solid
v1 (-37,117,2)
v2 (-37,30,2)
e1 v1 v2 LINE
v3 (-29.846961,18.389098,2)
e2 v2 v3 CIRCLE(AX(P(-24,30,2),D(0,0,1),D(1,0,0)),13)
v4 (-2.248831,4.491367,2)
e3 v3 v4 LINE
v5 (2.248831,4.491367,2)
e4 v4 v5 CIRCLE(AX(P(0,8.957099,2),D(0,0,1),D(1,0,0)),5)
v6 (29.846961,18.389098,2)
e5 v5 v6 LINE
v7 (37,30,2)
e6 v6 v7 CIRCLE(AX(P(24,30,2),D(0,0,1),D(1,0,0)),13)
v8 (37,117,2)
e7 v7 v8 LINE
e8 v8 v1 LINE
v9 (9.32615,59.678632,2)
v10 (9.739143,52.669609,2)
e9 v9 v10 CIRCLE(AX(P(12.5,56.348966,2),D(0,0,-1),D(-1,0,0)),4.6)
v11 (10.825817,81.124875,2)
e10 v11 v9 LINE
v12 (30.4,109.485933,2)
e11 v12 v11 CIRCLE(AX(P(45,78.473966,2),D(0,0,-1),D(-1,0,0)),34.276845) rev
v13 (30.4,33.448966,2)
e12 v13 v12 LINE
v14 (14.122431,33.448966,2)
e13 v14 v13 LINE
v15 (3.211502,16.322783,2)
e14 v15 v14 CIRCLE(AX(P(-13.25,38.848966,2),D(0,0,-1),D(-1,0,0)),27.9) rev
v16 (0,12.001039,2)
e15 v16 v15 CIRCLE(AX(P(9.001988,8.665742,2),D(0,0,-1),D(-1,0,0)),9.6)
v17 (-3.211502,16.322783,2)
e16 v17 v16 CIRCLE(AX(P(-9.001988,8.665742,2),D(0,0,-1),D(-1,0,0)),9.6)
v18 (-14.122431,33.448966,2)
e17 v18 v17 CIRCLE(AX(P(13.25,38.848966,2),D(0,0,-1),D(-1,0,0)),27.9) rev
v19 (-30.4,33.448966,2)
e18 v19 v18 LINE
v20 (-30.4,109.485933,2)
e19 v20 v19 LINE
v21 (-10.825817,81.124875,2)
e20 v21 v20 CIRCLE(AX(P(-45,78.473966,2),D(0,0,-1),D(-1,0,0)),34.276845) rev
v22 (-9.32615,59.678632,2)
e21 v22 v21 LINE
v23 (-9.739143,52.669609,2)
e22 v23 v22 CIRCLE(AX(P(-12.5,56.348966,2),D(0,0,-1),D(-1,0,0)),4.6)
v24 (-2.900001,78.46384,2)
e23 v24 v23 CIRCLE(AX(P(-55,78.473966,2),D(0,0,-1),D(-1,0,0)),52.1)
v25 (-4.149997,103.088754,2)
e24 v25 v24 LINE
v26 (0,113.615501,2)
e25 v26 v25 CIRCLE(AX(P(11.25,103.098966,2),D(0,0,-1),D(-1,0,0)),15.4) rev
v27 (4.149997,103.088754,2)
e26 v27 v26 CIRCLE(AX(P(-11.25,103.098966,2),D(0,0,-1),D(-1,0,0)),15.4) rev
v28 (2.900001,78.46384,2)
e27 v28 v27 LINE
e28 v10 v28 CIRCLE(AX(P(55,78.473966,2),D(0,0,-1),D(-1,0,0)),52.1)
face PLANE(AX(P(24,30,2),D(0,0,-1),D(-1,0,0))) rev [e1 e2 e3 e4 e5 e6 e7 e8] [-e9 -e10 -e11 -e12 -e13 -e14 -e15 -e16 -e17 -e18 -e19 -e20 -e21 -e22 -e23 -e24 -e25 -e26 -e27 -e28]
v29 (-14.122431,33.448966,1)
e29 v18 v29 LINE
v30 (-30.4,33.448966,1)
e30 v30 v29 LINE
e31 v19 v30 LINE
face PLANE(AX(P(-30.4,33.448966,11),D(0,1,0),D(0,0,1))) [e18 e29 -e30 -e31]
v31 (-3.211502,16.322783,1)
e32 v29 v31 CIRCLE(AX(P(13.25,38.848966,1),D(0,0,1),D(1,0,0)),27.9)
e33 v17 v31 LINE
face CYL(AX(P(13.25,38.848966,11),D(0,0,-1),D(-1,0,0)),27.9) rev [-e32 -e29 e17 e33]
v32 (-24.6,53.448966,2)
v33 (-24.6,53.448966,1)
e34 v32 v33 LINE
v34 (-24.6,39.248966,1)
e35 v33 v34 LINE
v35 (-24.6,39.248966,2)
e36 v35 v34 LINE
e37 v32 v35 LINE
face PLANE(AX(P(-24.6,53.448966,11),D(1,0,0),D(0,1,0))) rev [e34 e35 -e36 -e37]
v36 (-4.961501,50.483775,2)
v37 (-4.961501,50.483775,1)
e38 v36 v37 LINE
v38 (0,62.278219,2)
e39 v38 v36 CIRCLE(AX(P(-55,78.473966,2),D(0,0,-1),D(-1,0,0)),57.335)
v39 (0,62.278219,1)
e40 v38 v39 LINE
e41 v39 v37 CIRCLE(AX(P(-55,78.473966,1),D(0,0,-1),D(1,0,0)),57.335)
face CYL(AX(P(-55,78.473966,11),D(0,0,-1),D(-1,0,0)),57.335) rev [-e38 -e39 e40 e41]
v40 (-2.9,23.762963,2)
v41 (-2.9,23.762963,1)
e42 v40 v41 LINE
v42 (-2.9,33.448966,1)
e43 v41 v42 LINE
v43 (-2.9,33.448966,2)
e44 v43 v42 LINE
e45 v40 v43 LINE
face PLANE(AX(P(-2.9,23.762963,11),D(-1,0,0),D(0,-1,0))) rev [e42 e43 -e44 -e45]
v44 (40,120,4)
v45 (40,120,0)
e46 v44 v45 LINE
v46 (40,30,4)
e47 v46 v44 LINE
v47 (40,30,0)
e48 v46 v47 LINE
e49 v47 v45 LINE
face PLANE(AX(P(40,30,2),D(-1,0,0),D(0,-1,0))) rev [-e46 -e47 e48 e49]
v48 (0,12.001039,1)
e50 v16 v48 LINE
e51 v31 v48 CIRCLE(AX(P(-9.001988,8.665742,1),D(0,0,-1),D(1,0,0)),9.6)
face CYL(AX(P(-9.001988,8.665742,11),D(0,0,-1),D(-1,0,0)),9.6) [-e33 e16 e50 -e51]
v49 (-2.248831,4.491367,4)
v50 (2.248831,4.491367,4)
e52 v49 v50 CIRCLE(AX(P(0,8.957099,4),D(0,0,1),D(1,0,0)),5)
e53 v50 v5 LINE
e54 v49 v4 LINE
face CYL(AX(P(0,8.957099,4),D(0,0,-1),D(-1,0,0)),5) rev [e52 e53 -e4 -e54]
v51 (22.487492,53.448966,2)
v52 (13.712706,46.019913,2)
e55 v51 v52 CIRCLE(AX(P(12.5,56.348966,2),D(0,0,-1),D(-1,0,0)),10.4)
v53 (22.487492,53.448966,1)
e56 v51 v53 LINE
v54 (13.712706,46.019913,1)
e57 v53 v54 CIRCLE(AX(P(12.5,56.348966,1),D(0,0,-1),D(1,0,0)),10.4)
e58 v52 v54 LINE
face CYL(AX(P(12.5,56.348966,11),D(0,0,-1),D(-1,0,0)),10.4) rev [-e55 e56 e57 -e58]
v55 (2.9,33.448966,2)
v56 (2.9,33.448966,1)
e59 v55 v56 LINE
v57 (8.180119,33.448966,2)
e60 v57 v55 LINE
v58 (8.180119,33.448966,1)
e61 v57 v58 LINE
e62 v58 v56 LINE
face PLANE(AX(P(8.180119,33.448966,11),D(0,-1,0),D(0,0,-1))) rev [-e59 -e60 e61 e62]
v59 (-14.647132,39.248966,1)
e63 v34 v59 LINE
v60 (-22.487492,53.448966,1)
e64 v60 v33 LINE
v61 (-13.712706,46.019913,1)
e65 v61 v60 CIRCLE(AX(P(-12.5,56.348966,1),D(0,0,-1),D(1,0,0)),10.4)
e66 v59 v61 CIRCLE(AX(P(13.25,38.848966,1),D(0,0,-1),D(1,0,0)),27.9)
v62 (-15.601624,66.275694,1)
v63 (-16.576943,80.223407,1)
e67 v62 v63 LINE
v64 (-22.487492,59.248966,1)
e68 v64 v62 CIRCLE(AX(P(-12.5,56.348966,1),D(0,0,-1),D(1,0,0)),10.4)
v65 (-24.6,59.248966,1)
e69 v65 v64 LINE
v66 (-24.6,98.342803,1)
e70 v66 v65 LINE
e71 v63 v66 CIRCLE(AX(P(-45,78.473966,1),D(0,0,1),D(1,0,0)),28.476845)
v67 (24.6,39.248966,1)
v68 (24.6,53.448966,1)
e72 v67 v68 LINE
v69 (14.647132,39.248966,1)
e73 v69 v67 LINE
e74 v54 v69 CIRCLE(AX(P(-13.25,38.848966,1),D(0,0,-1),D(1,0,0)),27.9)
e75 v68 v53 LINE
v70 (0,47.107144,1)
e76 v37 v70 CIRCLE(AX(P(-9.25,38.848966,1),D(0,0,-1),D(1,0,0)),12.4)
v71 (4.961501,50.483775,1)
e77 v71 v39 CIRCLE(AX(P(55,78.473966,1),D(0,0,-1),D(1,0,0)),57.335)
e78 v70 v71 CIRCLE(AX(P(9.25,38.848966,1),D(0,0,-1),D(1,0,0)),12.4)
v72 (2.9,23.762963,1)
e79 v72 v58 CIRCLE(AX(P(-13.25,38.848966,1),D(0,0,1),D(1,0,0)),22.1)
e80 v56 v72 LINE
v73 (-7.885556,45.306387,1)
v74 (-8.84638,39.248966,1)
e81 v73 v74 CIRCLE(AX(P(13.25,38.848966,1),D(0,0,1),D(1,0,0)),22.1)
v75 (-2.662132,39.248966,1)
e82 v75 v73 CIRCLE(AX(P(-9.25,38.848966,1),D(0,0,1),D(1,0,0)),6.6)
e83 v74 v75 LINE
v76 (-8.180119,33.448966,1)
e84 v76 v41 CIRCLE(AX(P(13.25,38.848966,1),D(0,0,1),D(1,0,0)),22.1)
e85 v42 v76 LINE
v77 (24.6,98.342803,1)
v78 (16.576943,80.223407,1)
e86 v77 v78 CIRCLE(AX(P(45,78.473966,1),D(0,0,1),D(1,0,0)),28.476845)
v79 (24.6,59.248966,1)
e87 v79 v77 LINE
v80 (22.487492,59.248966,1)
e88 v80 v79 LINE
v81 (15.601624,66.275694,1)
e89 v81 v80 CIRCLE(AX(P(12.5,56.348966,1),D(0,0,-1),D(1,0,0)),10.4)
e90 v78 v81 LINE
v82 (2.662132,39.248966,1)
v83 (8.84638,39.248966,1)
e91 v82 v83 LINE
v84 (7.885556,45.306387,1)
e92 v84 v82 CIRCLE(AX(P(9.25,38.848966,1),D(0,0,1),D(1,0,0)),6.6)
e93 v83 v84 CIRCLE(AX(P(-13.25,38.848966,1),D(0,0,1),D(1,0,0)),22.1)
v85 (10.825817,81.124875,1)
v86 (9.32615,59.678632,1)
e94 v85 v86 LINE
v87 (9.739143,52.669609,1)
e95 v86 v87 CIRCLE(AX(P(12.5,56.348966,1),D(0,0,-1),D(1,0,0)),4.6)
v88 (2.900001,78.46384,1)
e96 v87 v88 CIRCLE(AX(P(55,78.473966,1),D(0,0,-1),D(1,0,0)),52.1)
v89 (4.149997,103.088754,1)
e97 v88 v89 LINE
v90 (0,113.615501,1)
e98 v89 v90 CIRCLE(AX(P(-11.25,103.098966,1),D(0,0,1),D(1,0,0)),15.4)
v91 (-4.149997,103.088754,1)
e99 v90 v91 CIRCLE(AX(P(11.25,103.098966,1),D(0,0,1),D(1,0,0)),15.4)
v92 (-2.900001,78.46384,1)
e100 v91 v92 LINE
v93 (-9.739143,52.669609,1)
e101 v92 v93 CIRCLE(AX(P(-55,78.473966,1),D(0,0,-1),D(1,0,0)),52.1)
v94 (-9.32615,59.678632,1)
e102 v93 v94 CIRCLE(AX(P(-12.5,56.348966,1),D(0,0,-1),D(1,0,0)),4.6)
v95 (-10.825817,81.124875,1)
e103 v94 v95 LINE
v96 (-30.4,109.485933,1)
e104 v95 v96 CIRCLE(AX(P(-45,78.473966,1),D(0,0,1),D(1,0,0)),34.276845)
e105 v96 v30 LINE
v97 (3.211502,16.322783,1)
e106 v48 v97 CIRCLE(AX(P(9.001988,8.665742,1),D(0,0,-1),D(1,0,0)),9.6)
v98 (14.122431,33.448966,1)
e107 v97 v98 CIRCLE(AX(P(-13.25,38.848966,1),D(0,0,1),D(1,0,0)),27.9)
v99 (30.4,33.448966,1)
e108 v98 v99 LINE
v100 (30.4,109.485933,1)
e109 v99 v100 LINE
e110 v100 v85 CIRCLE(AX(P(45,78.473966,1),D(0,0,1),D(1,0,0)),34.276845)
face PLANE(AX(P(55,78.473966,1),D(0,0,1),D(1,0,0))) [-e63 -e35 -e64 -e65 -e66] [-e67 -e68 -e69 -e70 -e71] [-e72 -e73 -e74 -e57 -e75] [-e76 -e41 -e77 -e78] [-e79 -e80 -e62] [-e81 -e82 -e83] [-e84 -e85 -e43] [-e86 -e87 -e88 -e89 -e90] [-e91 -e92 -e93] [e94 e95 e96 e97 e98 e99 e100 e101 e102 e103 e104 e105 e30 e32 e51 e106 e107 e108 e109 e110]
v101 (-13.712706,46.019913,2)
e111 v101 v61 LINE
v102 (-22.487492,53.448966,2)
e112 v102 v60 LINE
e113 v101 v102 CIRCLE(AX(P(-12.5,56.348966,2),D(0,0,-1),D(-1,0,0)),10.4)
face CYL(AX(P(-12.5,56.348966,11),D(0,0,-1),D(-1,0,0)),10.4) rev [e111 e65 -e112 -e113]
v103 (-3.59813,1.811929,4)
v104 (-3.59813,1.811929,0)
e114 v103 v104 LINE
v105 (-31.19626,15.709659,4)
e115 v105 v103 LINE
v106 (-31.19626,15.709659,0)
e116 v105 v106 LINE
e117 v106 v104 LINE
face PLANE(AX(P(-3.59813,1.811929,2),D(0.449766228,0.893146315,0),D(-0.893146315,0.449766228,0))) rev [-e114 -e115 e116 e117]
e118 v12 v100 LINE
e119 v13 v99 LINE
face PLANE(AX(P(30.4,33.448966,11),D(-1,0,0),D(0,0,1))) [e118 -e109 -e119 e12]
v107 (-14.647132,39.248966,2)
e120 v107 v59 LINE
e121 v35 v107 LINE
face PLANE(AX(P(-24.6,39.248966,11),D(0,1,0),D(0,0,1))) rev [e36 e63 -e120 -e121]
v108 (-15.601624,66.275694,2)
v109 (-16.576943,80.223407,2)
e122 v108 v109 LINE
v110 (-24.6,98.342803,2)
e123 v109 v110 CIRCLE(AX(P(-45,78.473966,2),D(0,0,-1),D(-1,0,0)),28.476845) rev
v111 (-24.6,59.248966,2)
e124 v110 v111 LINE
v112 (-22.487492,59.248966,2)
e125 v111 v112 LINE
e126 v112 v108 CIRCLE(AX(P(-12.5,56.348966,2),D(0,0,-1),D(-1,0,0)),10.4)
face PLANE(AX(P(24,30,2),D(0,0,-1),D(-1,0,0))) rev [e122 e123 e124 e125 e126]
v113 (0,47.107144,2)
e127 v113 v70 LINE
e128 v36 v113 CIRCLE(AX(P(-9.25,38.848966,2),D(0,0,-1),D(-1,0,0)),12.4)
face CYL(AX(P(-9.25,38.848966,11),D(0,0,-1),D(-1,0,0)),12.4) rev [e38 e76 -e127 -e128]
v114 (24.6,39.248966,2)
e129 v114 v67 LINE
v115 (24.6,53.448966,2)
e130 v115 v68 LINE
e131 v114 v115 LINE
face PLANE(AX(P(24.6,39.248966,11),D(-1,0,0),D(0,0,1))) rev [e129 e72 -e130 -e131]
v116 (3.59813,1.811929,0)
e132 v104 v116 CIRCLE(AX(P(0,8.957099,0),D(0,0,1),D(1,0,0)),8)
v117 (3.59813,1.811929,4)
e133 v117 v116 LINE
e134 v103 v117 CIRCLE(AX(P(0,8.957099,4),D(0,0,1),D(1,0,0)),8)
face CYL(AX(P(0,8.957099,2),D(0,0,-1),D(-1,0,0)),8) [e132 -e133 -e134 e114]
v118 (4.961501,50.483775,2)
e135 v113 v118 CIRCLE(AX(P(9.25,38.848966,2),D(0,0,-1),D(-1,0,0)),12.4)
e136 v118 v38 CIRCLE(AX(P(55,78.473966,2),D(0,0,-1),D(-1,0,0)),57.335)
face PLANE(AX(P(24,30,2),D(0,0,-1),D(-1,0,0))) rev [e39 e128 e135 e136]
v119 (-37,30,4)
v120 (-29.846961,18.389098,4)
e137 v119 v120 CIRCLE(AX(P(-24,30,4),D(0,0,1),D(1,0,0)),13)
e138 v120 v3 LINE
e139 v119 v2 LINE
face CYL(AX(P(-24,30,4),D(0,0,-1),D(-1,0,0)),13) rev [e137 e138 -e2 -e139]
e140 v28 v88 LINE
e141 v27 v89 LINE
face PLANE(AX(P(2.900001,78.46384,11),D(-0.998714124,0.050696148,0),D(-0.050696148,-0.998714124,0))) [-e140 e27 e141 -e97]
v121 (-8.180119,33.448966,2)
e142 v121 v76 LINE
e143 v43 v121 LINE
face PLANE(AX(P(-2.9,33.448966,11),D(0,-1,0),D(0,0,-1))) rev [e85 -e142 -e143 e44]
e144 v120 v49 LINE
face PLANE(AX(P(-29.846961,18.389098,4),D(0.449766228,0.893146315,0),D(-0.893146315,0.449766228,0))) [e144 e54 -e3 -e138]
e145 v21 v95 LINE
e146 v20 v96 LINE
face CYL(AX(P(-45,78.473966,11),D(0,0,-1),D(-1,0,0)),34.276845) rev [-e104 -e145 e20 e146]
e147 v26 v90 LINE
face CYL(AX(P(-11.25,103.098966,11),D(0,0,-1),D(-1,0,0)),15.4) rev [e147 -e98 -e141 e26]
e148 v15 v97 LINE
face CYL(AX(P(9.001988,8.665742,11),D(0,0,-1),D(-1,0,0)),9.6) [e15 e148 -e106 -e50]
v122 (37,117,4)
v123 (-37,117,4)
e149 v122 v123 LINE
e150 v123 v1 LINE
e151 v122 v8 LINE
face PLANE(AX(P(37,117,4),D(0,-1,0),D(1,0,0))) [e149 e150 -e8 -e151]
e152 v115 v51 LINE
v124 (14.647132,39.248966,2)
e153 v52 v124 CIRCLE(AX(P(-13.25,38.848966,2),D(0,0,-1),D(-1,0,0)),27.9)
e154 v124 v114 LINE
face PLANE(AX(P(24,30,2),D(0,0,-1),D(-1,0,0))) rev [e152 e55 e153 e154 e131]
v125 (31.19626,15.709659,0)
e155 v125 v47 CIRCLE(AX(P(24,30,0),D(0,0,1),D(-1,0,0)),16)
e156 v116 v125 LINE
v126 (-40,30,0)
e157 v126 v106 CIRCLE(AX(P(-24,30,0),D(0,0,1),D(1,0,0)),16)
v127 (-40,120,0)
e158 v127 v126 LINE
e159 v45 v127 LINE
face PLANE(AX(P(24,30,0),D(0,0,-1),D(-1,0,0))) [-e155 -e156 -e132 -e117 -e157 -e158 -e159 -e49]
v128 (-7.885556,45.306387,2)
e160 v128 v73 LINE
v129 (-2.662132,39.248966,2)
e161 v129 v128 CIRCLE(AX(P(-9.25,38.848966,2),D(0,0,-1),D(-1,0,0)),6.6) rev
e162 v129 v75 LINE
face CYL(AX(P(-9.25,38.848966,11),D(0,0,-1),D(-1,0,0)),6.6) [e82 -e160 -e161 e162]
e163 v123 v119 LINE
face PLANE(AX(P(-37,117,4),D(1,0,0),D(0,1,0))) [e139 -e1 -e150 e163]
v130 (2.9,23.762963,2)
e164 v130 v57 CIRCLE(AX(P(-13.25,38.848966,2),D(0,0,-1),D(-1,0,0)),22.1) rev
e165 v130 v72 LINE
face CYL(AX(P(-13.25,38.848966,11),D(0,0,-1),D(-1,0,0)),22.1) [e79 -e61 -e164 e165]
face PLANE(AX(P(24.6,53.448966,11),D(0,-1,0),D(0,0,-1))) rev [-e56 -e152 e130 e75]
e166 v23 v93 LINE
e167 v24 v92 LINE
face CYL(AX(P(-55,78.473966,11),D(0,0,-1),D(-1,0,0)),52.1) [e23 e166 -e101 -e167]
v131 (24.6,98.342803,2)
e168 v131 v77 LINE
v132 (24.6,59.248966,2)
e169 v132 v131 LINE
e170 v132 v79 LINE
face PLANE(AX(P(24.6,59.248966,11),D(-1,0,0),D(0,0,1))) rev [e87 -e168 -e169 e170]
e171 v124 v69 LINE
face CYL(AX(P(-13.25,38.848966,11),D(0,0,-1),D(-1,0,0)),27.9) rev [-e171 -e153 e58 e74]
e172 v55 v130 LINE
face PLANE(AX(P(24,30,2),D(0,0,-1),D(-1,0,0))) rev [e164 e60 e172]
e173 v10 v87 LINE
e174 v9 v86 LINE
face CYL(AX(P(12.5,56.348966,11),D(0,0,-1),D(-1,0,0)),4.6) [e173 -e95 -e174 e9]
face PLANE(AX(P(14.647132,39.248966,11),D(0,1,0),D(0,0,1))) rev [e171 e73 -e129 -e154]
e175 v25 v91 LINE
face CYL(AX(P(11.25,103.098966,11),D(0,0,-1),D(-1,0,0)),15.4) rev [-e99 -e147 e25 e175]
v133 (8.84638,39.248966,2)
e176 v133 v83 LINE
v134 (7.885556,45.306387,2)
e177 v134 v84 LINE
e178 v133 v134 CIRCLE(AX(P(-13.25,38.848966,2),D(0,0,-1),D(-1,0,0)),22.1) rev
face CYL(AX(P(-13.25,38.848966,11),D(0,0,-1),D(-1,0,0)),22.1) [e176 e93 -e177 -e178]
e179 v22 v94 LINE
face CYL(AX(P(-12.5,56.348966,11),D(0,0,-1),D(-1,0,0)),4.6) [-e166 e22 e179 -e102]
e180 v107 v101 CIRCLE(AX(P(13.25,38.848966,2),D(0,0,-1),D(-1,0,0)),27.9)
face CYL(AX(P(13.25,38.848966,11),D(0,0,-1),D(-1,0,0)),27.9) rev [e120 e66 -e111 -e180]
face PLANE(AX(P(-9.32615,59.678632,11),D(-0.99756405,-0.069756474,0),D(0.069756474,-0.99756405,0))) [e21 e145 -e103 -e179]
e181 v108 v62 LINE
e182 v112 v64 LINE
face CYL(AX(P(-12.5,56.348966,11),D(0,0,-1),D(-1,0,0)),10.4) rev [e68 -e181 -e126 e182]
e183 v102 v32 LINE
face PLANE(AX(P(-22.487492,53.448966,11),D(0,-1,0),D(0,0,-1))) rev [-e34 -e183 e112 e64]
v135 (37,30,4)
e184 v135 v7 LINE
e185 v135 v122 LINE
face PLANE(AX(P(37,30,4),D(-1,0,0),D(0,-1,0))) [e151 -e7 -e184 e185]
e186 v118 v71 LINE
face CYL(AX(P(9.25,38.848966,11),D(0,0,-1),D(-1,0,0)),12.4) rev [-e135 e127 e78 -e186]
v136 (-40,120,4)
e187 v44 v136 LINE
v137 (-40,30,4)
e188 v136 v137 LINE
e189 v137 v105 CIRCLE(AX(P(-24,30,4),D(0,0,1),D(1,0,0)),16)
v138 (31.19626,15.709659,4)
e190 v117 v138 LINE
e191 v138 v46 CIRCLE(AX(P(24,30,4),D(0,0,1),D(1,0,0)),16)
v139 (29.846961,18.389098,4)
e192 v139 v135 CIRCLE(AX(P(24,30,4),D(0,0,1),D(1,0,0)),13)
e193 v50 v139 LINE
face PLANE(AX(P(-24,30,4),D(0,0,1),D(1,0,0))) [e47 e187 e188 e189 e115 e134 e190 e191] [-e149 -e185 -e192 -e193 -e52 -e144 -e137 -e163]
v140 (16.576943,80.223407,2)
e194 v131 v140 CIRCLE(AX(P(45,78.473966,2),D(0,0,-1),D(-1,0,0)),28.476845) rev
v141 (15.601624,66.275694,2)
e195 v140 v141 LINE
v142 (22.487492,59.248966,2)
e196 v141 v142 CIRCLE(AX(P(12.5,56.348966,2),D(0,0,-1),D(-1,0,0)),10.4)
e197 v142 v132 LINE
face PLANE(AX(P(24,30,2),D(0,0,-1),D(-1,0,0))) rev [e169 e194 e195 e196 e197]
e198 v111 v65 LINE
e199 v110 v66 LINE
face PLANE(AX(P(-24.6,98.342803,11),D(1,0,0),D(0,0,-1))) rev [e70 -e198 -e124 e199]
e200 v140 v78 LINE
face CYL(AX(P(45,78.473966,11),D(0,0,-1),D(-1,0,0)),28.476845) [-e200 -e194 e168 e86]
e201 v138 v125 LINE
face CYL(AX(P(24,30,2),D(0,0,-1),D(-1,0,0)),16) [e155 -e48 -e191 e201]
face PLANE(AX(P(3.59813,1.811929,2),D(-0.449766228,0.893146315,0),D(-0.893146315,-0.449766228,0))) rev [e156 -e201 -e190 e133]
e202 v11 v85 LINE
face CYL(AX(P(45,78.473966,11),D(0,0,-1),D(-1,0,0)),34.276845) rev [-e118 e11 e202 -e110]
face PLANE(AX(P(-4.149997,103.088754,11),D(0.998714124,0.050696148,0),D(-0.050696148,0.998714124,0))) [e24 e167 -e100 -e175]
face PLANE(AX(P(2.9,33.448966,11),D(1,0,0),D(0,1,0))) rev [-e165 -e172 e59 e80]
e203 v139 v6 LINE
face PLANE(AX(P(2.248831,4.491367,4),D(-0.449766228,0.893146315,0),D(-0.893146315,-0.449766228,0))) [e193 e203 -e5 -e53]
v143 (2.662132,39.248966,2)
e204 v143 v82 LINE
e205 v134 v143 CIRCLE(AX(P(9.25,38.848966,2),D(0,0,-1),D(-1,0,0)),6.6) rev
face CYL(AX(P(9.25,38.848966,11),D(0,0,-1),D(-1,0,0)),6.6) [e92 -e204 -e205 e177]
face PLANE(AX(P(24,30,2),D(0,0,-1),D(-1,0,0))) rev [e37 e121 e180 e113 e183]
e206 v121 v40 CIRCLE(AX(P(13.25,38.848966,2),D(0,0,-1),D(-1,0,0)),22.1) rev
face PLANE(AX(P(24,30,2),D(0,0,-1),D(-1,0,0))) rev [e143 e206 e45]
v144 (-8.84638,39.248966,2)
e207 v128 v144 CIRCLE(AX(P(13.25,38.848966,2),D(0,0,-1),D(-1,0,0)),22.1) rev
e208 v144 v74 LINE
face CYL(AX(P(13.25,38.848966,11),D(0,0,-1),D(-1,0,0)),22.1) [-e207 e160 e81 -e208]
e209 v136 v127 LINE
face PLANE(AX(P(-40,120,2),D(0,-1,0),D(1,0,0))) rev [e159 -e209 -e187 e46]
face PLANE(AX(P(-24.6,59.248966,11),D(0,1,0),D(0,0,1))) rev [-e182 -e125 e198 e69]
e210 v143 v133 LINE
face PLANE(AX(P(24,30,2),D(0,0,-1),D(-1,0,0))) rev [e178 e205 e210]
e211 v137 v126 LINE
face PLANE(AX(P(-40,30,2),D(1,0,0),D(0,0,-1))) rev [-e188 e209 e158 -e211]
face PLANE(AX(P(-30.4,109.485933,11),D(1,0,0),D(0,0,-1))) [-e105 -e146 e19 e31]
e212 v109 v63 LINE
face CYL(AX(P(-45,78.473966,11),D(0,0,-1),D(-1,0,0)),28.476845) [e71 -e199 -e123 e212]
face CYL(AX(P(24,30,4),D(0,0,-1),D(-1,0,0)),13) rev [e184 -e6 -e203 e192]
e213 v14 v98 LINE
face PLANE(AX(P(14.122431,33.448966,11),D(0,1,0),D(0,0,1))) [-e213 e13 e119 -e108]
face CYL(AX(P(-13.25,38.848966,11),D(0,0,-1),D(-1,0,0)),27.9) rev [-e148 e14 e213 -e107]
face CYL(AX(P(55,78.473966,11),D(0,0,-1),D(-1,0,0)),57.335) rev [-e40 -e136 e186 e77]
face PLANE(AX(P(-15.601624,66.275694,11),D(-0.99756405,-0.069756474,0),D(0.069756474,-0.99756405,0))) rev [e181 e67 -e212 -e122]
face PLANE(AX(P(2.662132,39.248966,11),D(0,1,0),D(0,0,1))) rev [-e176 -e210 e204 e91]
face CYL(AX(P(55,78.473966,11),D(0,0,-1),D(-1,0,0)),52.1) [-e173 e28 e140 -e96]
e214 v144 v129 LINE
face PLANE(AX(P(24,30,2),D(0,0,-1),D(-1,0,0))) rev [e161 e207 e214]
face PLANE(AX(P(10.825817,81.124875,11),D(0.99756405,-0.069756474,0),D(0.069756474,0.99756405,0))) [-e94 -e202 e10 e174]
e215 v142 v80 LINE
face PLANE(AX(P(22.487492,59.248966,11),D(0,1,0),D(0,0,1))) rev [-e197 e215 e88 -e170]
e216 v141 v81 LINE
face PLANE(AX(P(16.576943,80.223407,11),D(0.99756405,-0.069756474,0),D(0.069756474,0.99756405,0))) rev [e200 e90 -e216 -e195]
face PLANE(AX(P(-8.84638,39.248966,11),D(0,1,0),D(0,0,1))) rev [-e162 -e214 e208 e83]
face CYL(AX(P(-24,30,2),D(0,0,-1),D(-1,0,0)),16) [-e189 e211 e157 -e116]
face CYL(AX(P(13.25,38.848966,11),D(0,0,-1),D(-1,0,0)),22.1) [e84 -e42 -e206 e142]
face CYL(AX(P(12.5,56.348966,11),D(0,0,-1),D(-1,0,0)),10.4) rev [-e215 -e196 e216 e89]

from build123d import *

# Parameters (mm, degrees)
EXTRUDE_1_DEPTH     = 2
EXTRUDE_2_DEPTH     = 2
OTHER_START         = 1
OTHER_1_DEPTH       = 1
CUT_EXTRUDE_1_DEPTH = 10


# Read off the part's stored shape, not the designer's step: Полость1
with BuildPart() as part:
    # Эскиз1 → Бобышка-Вытянуть1 (new body)
    with BuildSketch(Plane.XY):
        with BuildLine():
            Line((-3.59812982, 1.811928513), (-31.19625964, 15.709658955))
            ThreePointArc((-31.19625964, 15.709658955), (-37.622410841, 21.607746257), (-40, 30))
            Line((-40, 30), (-40, 120))
            Line((-40, 120), (40, 120))
            Line((40, 120), (40, 30))
            ThreePointArc((40, 30), (37.622410841, 21.607746257), (31.19625964, 15.709658955))
            Line((31.19625964, 15.709658955), (3.59812982, 1.811928513))
            ThreePointArc((3.59812982, 1.811928513), (0, 0.957099036), (-3.59812982, 1.811928513))
        make_face()
    extrude(amount=EXTRUDE_1_DEPTH)

    # Эскиз2 → Бобышка-Вытянуть2 (add)
    with BuildSketch(Plane.XY.offset(2)):
        with BuildLine():
            Line((40, 120), (-40, 120))
            Line((-40, 120), (-40, 30))
            ThreePointArc((-40, 30), (-37.622410841, 21.607746257), (-31.19625964, 15.709658955))
            Line((-31.19625964, 15.709658955), (-3.59812982, 1.811928513))
            ThreePointArc((-3.59812982, 1.811928513), (0, 0.957099036), (3.59812982, 1.811928513))
            Line((3.59812982, 1.811928513), (31.19625964, 15.709658955))
            ThreePointArc((31.19625964, 15.709658955), (37.622410841, 21.607746257), (40, 30))
            Line((40, 30), (40, 120))
        make_face()
        with BuildLine():
            Line((37, 117), (-37, 117))
            Line((-37, 117), (-37, 30))
            ThreePointArc((-37, 30), (-35.068208808, 23.181293834), (-29.846960958, 18.389097901))
            Line((-29.846960958, 18.389097901), (-2.248831138, 4.491367459))
            ThreePointArc((-2.248831138, 4.491367459), (0, 3.957099036), (2.248831138, 4.491367459))
            Line((2.248831138, 4.491367459), (29.846960958, 18.389097901))
            ThreePointArc((29.846960958, 18.389097901), (35.068208808, 23.181293834), (37, 30))
            Line((37, 30), (37, 117))
        make_face(mode=Mode.SUBTRACT)
    extrude(amount=EXTRUDE_2_DEPTH)

    # Полость1 outline → Полость1 (cut)
    with BuildSketch(Plane.XY.offset(OTHER_START)):
        with BuildLine():
            ThreePointArc((9.788029472, 60.549586915), (17.495233568, 56.130696454), (9.431968209, 52.400905625))
            ThreePointArc((9.431968209, 52.400905625), (4.262579544, 64.984556644), (2.5, 78.473966026))
            Line((2.5, 78.473966026), (3.75, 103.098966026))
            ThreePointArc((3.75, 103.098966026), (2.7812152, 108.402266884), (0, 113.020533442))
            ThreePointArc((0, 113.020533442), (-2.7812152, 108.402266884), (-3.75, 103.098966026))
            Line((-3.75, 103.098966026), (-2.5, 78.473966026))
            ThreePointArc((-2.5, 78.473966026), (-4.262579544, 64.984556644), (-9.431968209, 52.400905625))
            ThreePointArc((-9.431968209, 52.400905625), (-17.495233567, 56.130696454), (-9.788029472, 60.549586915))
            Line((-9.788029472, 60.549586915), (-11.224736233, 81.095450805))
            ThreePointArc((-11.224736233, 81.095450805), (-16.940759264, 97.456053222), (-30, 108.848966026))
            Line((-30, 108.848966026), (-30, 33.848966026))
            Line((-30, 33.848966026), (-13.791634566, 33.848966026))
            ThreePointArc((-13.791634566, 33.848966026), (-10.030008845, 24.210277963), (-2.972883984, 16.643830691))
            ThreePointArc((-2.972883984, 16.643830691), (-1.271172874, 15.008808512), (0, 13.020533442))
            ThreePointArc((0, 13.020533442), (1.271172874, 15.008808512), (2.972883984, 16.643830691))
            ThreePointArc((2.972883984, 16.643830691), (10.030008845, 24.210277963), (13.791634566, 33.848966026))
            Line((13.791634566, 33.848966026), (30, 33.848966026))
            Line((30, 33.848966026), (30, 108.848966026))
            ThreePointArc((30, 108.848966026), (16.940759264, 97.456053222), (11.224736233, 81.095450805))
            Line((11.224736233, 81.095450805), (9.788029472, 60.549586915))
        make_face()
        with BuildLine():
            ThreePointArc((-2.5, 22.780752061), (-6.389541147, 27.869966821), (-8.687410968, 33.848966026))
            Line((-8.687410968, 33.848966026), (-2.5, 33.848966026))
            Line((-2.5, 33.848966026), (-2.5, 22.780752061))
        make_face(mode=Mode.SUBTRACT)
        with BuildLine():
            ThreePointArc((-13.200536483, 46.373533772), (-13.986370475, 42.647666246), (-14.25, 38.848966026))
            Line((-14.25, 38.848966026), (-25, 38.848966026))
            Line((-25, 38.848966026), (-25, 53.848966026))
            Line((-25, 53.848966026), (-22.182458365, 53.848966026))
            ThreePointArc((-22.182458365, 53.848966026), (-18.897043641, 48.662755473), (-13.200536483, 46.373533772))
        make_face(mode=Mode.SUBTRACT)
        with BuildLine():
            ThreePointArc((-8.161111111, 45.763756043), (-3.92918135, 43.397470053), (-2.25, 38.848966026))
            Line((-2.25, 38.848966026), (-9.25, 38.848966026))
            ThreePointArc((-9.25, 38.848966026), (-8.976110771, 42.348966026), (-8.161111111, 45.763756043))
        make_face(mode=Mode.SUBTRACT)
        with BuildLine():
            Line((2.5, 22.780752061), (2.5, 33.848966026))
            Line((2.5, 33.848966026), (8.687410969, 33.848966026))
            ThreePointArc((8.687410969, 33.848966026), (6.389541147, 27.869966821), (2.5, 22.780752061))
        make_face(mode=Mode.SUBTRACT)
        with BuildLine():
            ThreePointArc((2.25, 38.848966026), (3.92918135, 43.397470053), (8.161111111, 45.763756043))
            ThreePointArc((8.161111111, 45.763756043), (8.976110771, 42.348966026), (9.25, 38.848966026))
            Line((9.25, 38.848966026), (2.25, 38.848966026))
        make_face(mode=Mode.SUBTRACT)
        with BuildLine():
            ThreePointArc((0, 63.756825508), (2.33883829, 56.831501462), (5.545675565, 50.262904017))
            ThreePointArc((5.545675565, 50.262904017), (2.504193555, 48.773385172), (0, 46.493408451))
            ThreePointArc((0, 46.493408451), (-2.504193555, 48.773385172), (-5.545675565, 50.262904017))
            ThreePointArc((-5.545675565, 50.262904017), (-2.33883829, 56.831501462), (0, 63.756825508))
        make_face(mode=Mode.SUBTRACT)
        with BuildLine():
            ThreePointArc((14.25, 38.848966026), (13.986370475, 42.647666246), (13.200536483, 46.373533772))
            ThreePointArc((13.200536483, 46.373533772), (18.897043642, 48.662755473), (22.182458366, 53.848966026))
            Line((22.182458366, 53.848966026), (25, 53.848966026))
            Line((25, 53.848966026), (25, 38.848966026))
            Line((25, 38.848966026), (14.25, 38.848966026))
        make_face(mode=Mode.SUBTRACT)
        with BuildLine():
            ThreePointArc((-15.180187421, 65.983103008), (-19.636717055, 63.353769354), (-22.182458365, 58.848966026))
            Line((-22.182458365, 58.848966026), (-25, 58.848966026))
            Line((-25, 58.848966026), (-25, 99.303564565))
            ThreePointArc((-25, 99.303564565), (-18.795712851, 90.606876243), (-16.177801663, 80.249651334))
            Line((-16.177801663, 80.249651334), (-15.180187421, 65.983103008))
        make_face(mode=Mode.SUBTRACT)
        with BuildLine():
            ThreePointArc((16.177801663, 80.249651334), (18.795712851, 90.606876243), (25, 99.303564565))
            Line((25, 99.303564565), (25, 58.848966026))
            Line((25, 58.848966026), (22.182458366, 58.848966026))
            ThreePointArc((22.182458366, 58.848966026), (19.636717055, 63.353769354), (15.180187421, 65.983103008))
            Line((15.180187421, 65.983103008), (16.177801663, 80.249651334))
        make_face(mode=Mode.SUBTRACT)
    extrude(amount=OTHER_1_DEPTH, mode=Mode.SUBTRACT)

    # Эскиз3 → Вырез-Вытянуть1 (cut)
    with BuildSketch(Plane.XY.offset(1)):
        with BuildLine():
            Line((-30.4, 109.485933086), (-30.4, 33.448966026))
            Line((-30.4, 33.448966026), (-14.122431386, 33.448966026))
            ThreePointArc((-14.122431386, 33.448966026), (-10.280405338, 23.857967906), (-3.211502278, 16.322782533))
            ThreePointArc((-3.211502278, 16.322782533), (-1.296555795, 14.391675131), (0, 12.001039461))
            ThreePointArc((0, 12.001039461), (1.296555795, 14.391675131), (3.211502278, 16.322782533))
            ThreePointArc((3.211502278, 16.322782533), (10.280405338, 23.857967906), (14.122431386, 33.448966026))
            Line((14.122431386, 33.448966026), (30.4, 33.448966026))
            Line((30.4, 33.448966026), (30.4, 109.485933086))
            ThreePointArc((30.4, 109.485933086), (16.789759987, 97.944057432), (10.825816986, 81.124874611))
            Line((10.825816986, 81.124874611), (9.326149592, 59.678631713))
            ThreePointArc((9.326149592, 59.678631713), (17.092035273, 56.619543276), (9.739143413, 52.669608621))
            ThreePointArc((9.739143413, 52.669608621), (4.640098892, 65.12142468), (2.900000984, 78.46383966))
            Line((2.900000984, 78.46383966), (4.149996614, 103.088753565))
            ThreePointArc((4.149996614, 103.088753565), (3.076851741, 108.747091307), (0, 113.615500626))
            ThreePointArc((0, 113.615500626), (-3.076851741, 108.747091307), (-4.149996614, 103.088753565))
            Line((-4.149996614, 103.088753565), (-2.900000984, 78.46383966))
            ThreePointArc((-2.900000984, 78.46383966), (-4.640098892, 65.12142468), (-9.739143413, 52.669608621))
            ThreePointArc((-9.739143413, 52.669608621), (-17.092035273, 56.619543276), (-9.326149592, 59.678631713))
            Line((-9.326149592, 59.678631713), (-10.825816986, 81.124874611))
            ThreePointArc((-10.825816986, 81.124874611), (-16.789759986, 97.944057431), (-30.4, 109.485933086))
        make_face()
        with BuildLine():
            Line((-24.6, 98.342803418), (-24.6, 59.248966026))
            Line((-24.6, 59.248966026), (-22.487492178, 59.248966026))
            ThreePointArc((-22.487492178, 59.248966026), (-19.927985451, 63.628047845), (-15.601624133, 66.275693973))
            Line((-15.601624133, 66.275693973), (-16.57694324, 80.223407018))
            ThreePointArc((-16.57694324, 80.223407018), (-18.961550559, 90.003486832), (-24.6, 98.342803418))
        make_face(mode=Mode.SUBTRACT)
        with BuildLine():
            Line((-24.6, 39.248966026), (-14.647132469, 39.248966026))
            ThreePointArc((-14.647132469, 39.248966026), (-14.388051735, 42.663162704), (-13.71270618, 46.019912646))
            ThreePointArc((-13.71270618, 46.019912646), (-19.220031201, 48.411637718), (-22.487492178, 53.448966026))
            Line((-22.487492178, 53.448966026), (-24.6, 53.448966026))
            Line((-24.6, 53.448966026), (-24.6, 39.248966026))
        make_face(mode=Mode.SUBTRACT)
        with BuildLine():
            Line((-8.846379794, 39.248966026), (-2.662132363, 39.248966026))
            ThreePointArc((-2.662132363, 39.248966026), (-4.251709751, 43.159081405), (-7.885555556, 45.306387443))
            ThreePointArc((-7.885555556, 45.306387443), (-8.577119532, 42.311169504), (-8.846379794, 39.248966026))
        make_face(mode=Mode.SUBTRACT)
        with BuildLine():
            Line((2.662132363, 39.248966026), (8.846379794, 39.248966026))
            ThreePointArc((8.846379794, 39.248966026), (8.577119532, 42.311169504), (7.885555556, 45.306387443))
            ThreePointArc((7.885555556, 45.306387443), (4.251709751, 43.159081405), (2.662132363, 39.248966026))
        make_face(mode=Mode.SUBTRACT)
        with BuildLine():
            Line((-2.9, 33.448966026), (-8.180118992, 33.448966026))
            ThreePointArc((-8.180118992, 33.448966026), (-6.154149081, 28.271206412), (-2.9, 23.762962579))
            Line((-2.9, 23.762962579), (-2.9, 33.448966026))
        make_face(mode=Mode.SUBTRACT)
        with BuildLine():
            Line((8.180118992, 33.448966026), (2.9, 33.448966026))
            Line((2.9, 33.448966026), (2.9, 23.762962579))
            ThreePointArc((2.9, 23.762962579), (6.154149081, 28.271206412), (8.180118992, 33.448966026))
        make_face(mode=Mode.SUBTRACT)
        with BuildLine():
            Line((14.647132469, 39.248966026), (24.6, 39.248966026))
            Line((24.6, 39.248966026), (24.6, 53.448966026))
            Line((24.6, 53.448966026), (22.487492178, 53.448966026))
            ThreePointArc((22.487492178, 53.448966026), (19.220031201, 48.411637718), (13.71270618, 46.019912646))
            ThreePointArc((13.71270618, 46.019912646), (14.388051735, 42.663162704), (14.647132469, 39.248966026))
        make_face(mode=Mode.SUBTRACT)
        with BuildLine():
            Line((22.487492178, 59.248966026), (24.6, 59.248966026))
            Line((24.6, 59.248966026), (24.6, 98.342803418))
            ThreePointArc((24.6, 98.342803418), (18.961550559, 90.003486832), (16.57694324, 80.223407018))
            Line((16.57694324, 80.223407018), (15.601624133, 66.275693973))
            ThreePointArc((15.601624133, 66.275693973), (19.927985451, 63.628047845), (22.487492178, 59.248966026))
        make_face(mode=Mode.SUBTRACT)
        with BuildLine():
            ThreePointArc((0, 47.107143791), (-2.273385478, 49.100153753), (-4.961500663, 50.483774724))
            ThreePointArc((-4.961500663, 50.483774724), (-2.150697128, 56.242155237), (0, 62.278218899))
            ThreePointArc((0, 62.278218899), (2.150697128, 56.242155237), (4.961500663, 50.483774724))
            ThreePointArc((4.961500663, 50.483774724), (2.273385478, 49.100153753), (0, 47.107143791))
        make_face(mode=Mode.SUBTRACT)
    extrude(amount=CUT_EXTRUDE_1_DEPTH, mode=Mode.SUBTRACT)


solid = part.part
